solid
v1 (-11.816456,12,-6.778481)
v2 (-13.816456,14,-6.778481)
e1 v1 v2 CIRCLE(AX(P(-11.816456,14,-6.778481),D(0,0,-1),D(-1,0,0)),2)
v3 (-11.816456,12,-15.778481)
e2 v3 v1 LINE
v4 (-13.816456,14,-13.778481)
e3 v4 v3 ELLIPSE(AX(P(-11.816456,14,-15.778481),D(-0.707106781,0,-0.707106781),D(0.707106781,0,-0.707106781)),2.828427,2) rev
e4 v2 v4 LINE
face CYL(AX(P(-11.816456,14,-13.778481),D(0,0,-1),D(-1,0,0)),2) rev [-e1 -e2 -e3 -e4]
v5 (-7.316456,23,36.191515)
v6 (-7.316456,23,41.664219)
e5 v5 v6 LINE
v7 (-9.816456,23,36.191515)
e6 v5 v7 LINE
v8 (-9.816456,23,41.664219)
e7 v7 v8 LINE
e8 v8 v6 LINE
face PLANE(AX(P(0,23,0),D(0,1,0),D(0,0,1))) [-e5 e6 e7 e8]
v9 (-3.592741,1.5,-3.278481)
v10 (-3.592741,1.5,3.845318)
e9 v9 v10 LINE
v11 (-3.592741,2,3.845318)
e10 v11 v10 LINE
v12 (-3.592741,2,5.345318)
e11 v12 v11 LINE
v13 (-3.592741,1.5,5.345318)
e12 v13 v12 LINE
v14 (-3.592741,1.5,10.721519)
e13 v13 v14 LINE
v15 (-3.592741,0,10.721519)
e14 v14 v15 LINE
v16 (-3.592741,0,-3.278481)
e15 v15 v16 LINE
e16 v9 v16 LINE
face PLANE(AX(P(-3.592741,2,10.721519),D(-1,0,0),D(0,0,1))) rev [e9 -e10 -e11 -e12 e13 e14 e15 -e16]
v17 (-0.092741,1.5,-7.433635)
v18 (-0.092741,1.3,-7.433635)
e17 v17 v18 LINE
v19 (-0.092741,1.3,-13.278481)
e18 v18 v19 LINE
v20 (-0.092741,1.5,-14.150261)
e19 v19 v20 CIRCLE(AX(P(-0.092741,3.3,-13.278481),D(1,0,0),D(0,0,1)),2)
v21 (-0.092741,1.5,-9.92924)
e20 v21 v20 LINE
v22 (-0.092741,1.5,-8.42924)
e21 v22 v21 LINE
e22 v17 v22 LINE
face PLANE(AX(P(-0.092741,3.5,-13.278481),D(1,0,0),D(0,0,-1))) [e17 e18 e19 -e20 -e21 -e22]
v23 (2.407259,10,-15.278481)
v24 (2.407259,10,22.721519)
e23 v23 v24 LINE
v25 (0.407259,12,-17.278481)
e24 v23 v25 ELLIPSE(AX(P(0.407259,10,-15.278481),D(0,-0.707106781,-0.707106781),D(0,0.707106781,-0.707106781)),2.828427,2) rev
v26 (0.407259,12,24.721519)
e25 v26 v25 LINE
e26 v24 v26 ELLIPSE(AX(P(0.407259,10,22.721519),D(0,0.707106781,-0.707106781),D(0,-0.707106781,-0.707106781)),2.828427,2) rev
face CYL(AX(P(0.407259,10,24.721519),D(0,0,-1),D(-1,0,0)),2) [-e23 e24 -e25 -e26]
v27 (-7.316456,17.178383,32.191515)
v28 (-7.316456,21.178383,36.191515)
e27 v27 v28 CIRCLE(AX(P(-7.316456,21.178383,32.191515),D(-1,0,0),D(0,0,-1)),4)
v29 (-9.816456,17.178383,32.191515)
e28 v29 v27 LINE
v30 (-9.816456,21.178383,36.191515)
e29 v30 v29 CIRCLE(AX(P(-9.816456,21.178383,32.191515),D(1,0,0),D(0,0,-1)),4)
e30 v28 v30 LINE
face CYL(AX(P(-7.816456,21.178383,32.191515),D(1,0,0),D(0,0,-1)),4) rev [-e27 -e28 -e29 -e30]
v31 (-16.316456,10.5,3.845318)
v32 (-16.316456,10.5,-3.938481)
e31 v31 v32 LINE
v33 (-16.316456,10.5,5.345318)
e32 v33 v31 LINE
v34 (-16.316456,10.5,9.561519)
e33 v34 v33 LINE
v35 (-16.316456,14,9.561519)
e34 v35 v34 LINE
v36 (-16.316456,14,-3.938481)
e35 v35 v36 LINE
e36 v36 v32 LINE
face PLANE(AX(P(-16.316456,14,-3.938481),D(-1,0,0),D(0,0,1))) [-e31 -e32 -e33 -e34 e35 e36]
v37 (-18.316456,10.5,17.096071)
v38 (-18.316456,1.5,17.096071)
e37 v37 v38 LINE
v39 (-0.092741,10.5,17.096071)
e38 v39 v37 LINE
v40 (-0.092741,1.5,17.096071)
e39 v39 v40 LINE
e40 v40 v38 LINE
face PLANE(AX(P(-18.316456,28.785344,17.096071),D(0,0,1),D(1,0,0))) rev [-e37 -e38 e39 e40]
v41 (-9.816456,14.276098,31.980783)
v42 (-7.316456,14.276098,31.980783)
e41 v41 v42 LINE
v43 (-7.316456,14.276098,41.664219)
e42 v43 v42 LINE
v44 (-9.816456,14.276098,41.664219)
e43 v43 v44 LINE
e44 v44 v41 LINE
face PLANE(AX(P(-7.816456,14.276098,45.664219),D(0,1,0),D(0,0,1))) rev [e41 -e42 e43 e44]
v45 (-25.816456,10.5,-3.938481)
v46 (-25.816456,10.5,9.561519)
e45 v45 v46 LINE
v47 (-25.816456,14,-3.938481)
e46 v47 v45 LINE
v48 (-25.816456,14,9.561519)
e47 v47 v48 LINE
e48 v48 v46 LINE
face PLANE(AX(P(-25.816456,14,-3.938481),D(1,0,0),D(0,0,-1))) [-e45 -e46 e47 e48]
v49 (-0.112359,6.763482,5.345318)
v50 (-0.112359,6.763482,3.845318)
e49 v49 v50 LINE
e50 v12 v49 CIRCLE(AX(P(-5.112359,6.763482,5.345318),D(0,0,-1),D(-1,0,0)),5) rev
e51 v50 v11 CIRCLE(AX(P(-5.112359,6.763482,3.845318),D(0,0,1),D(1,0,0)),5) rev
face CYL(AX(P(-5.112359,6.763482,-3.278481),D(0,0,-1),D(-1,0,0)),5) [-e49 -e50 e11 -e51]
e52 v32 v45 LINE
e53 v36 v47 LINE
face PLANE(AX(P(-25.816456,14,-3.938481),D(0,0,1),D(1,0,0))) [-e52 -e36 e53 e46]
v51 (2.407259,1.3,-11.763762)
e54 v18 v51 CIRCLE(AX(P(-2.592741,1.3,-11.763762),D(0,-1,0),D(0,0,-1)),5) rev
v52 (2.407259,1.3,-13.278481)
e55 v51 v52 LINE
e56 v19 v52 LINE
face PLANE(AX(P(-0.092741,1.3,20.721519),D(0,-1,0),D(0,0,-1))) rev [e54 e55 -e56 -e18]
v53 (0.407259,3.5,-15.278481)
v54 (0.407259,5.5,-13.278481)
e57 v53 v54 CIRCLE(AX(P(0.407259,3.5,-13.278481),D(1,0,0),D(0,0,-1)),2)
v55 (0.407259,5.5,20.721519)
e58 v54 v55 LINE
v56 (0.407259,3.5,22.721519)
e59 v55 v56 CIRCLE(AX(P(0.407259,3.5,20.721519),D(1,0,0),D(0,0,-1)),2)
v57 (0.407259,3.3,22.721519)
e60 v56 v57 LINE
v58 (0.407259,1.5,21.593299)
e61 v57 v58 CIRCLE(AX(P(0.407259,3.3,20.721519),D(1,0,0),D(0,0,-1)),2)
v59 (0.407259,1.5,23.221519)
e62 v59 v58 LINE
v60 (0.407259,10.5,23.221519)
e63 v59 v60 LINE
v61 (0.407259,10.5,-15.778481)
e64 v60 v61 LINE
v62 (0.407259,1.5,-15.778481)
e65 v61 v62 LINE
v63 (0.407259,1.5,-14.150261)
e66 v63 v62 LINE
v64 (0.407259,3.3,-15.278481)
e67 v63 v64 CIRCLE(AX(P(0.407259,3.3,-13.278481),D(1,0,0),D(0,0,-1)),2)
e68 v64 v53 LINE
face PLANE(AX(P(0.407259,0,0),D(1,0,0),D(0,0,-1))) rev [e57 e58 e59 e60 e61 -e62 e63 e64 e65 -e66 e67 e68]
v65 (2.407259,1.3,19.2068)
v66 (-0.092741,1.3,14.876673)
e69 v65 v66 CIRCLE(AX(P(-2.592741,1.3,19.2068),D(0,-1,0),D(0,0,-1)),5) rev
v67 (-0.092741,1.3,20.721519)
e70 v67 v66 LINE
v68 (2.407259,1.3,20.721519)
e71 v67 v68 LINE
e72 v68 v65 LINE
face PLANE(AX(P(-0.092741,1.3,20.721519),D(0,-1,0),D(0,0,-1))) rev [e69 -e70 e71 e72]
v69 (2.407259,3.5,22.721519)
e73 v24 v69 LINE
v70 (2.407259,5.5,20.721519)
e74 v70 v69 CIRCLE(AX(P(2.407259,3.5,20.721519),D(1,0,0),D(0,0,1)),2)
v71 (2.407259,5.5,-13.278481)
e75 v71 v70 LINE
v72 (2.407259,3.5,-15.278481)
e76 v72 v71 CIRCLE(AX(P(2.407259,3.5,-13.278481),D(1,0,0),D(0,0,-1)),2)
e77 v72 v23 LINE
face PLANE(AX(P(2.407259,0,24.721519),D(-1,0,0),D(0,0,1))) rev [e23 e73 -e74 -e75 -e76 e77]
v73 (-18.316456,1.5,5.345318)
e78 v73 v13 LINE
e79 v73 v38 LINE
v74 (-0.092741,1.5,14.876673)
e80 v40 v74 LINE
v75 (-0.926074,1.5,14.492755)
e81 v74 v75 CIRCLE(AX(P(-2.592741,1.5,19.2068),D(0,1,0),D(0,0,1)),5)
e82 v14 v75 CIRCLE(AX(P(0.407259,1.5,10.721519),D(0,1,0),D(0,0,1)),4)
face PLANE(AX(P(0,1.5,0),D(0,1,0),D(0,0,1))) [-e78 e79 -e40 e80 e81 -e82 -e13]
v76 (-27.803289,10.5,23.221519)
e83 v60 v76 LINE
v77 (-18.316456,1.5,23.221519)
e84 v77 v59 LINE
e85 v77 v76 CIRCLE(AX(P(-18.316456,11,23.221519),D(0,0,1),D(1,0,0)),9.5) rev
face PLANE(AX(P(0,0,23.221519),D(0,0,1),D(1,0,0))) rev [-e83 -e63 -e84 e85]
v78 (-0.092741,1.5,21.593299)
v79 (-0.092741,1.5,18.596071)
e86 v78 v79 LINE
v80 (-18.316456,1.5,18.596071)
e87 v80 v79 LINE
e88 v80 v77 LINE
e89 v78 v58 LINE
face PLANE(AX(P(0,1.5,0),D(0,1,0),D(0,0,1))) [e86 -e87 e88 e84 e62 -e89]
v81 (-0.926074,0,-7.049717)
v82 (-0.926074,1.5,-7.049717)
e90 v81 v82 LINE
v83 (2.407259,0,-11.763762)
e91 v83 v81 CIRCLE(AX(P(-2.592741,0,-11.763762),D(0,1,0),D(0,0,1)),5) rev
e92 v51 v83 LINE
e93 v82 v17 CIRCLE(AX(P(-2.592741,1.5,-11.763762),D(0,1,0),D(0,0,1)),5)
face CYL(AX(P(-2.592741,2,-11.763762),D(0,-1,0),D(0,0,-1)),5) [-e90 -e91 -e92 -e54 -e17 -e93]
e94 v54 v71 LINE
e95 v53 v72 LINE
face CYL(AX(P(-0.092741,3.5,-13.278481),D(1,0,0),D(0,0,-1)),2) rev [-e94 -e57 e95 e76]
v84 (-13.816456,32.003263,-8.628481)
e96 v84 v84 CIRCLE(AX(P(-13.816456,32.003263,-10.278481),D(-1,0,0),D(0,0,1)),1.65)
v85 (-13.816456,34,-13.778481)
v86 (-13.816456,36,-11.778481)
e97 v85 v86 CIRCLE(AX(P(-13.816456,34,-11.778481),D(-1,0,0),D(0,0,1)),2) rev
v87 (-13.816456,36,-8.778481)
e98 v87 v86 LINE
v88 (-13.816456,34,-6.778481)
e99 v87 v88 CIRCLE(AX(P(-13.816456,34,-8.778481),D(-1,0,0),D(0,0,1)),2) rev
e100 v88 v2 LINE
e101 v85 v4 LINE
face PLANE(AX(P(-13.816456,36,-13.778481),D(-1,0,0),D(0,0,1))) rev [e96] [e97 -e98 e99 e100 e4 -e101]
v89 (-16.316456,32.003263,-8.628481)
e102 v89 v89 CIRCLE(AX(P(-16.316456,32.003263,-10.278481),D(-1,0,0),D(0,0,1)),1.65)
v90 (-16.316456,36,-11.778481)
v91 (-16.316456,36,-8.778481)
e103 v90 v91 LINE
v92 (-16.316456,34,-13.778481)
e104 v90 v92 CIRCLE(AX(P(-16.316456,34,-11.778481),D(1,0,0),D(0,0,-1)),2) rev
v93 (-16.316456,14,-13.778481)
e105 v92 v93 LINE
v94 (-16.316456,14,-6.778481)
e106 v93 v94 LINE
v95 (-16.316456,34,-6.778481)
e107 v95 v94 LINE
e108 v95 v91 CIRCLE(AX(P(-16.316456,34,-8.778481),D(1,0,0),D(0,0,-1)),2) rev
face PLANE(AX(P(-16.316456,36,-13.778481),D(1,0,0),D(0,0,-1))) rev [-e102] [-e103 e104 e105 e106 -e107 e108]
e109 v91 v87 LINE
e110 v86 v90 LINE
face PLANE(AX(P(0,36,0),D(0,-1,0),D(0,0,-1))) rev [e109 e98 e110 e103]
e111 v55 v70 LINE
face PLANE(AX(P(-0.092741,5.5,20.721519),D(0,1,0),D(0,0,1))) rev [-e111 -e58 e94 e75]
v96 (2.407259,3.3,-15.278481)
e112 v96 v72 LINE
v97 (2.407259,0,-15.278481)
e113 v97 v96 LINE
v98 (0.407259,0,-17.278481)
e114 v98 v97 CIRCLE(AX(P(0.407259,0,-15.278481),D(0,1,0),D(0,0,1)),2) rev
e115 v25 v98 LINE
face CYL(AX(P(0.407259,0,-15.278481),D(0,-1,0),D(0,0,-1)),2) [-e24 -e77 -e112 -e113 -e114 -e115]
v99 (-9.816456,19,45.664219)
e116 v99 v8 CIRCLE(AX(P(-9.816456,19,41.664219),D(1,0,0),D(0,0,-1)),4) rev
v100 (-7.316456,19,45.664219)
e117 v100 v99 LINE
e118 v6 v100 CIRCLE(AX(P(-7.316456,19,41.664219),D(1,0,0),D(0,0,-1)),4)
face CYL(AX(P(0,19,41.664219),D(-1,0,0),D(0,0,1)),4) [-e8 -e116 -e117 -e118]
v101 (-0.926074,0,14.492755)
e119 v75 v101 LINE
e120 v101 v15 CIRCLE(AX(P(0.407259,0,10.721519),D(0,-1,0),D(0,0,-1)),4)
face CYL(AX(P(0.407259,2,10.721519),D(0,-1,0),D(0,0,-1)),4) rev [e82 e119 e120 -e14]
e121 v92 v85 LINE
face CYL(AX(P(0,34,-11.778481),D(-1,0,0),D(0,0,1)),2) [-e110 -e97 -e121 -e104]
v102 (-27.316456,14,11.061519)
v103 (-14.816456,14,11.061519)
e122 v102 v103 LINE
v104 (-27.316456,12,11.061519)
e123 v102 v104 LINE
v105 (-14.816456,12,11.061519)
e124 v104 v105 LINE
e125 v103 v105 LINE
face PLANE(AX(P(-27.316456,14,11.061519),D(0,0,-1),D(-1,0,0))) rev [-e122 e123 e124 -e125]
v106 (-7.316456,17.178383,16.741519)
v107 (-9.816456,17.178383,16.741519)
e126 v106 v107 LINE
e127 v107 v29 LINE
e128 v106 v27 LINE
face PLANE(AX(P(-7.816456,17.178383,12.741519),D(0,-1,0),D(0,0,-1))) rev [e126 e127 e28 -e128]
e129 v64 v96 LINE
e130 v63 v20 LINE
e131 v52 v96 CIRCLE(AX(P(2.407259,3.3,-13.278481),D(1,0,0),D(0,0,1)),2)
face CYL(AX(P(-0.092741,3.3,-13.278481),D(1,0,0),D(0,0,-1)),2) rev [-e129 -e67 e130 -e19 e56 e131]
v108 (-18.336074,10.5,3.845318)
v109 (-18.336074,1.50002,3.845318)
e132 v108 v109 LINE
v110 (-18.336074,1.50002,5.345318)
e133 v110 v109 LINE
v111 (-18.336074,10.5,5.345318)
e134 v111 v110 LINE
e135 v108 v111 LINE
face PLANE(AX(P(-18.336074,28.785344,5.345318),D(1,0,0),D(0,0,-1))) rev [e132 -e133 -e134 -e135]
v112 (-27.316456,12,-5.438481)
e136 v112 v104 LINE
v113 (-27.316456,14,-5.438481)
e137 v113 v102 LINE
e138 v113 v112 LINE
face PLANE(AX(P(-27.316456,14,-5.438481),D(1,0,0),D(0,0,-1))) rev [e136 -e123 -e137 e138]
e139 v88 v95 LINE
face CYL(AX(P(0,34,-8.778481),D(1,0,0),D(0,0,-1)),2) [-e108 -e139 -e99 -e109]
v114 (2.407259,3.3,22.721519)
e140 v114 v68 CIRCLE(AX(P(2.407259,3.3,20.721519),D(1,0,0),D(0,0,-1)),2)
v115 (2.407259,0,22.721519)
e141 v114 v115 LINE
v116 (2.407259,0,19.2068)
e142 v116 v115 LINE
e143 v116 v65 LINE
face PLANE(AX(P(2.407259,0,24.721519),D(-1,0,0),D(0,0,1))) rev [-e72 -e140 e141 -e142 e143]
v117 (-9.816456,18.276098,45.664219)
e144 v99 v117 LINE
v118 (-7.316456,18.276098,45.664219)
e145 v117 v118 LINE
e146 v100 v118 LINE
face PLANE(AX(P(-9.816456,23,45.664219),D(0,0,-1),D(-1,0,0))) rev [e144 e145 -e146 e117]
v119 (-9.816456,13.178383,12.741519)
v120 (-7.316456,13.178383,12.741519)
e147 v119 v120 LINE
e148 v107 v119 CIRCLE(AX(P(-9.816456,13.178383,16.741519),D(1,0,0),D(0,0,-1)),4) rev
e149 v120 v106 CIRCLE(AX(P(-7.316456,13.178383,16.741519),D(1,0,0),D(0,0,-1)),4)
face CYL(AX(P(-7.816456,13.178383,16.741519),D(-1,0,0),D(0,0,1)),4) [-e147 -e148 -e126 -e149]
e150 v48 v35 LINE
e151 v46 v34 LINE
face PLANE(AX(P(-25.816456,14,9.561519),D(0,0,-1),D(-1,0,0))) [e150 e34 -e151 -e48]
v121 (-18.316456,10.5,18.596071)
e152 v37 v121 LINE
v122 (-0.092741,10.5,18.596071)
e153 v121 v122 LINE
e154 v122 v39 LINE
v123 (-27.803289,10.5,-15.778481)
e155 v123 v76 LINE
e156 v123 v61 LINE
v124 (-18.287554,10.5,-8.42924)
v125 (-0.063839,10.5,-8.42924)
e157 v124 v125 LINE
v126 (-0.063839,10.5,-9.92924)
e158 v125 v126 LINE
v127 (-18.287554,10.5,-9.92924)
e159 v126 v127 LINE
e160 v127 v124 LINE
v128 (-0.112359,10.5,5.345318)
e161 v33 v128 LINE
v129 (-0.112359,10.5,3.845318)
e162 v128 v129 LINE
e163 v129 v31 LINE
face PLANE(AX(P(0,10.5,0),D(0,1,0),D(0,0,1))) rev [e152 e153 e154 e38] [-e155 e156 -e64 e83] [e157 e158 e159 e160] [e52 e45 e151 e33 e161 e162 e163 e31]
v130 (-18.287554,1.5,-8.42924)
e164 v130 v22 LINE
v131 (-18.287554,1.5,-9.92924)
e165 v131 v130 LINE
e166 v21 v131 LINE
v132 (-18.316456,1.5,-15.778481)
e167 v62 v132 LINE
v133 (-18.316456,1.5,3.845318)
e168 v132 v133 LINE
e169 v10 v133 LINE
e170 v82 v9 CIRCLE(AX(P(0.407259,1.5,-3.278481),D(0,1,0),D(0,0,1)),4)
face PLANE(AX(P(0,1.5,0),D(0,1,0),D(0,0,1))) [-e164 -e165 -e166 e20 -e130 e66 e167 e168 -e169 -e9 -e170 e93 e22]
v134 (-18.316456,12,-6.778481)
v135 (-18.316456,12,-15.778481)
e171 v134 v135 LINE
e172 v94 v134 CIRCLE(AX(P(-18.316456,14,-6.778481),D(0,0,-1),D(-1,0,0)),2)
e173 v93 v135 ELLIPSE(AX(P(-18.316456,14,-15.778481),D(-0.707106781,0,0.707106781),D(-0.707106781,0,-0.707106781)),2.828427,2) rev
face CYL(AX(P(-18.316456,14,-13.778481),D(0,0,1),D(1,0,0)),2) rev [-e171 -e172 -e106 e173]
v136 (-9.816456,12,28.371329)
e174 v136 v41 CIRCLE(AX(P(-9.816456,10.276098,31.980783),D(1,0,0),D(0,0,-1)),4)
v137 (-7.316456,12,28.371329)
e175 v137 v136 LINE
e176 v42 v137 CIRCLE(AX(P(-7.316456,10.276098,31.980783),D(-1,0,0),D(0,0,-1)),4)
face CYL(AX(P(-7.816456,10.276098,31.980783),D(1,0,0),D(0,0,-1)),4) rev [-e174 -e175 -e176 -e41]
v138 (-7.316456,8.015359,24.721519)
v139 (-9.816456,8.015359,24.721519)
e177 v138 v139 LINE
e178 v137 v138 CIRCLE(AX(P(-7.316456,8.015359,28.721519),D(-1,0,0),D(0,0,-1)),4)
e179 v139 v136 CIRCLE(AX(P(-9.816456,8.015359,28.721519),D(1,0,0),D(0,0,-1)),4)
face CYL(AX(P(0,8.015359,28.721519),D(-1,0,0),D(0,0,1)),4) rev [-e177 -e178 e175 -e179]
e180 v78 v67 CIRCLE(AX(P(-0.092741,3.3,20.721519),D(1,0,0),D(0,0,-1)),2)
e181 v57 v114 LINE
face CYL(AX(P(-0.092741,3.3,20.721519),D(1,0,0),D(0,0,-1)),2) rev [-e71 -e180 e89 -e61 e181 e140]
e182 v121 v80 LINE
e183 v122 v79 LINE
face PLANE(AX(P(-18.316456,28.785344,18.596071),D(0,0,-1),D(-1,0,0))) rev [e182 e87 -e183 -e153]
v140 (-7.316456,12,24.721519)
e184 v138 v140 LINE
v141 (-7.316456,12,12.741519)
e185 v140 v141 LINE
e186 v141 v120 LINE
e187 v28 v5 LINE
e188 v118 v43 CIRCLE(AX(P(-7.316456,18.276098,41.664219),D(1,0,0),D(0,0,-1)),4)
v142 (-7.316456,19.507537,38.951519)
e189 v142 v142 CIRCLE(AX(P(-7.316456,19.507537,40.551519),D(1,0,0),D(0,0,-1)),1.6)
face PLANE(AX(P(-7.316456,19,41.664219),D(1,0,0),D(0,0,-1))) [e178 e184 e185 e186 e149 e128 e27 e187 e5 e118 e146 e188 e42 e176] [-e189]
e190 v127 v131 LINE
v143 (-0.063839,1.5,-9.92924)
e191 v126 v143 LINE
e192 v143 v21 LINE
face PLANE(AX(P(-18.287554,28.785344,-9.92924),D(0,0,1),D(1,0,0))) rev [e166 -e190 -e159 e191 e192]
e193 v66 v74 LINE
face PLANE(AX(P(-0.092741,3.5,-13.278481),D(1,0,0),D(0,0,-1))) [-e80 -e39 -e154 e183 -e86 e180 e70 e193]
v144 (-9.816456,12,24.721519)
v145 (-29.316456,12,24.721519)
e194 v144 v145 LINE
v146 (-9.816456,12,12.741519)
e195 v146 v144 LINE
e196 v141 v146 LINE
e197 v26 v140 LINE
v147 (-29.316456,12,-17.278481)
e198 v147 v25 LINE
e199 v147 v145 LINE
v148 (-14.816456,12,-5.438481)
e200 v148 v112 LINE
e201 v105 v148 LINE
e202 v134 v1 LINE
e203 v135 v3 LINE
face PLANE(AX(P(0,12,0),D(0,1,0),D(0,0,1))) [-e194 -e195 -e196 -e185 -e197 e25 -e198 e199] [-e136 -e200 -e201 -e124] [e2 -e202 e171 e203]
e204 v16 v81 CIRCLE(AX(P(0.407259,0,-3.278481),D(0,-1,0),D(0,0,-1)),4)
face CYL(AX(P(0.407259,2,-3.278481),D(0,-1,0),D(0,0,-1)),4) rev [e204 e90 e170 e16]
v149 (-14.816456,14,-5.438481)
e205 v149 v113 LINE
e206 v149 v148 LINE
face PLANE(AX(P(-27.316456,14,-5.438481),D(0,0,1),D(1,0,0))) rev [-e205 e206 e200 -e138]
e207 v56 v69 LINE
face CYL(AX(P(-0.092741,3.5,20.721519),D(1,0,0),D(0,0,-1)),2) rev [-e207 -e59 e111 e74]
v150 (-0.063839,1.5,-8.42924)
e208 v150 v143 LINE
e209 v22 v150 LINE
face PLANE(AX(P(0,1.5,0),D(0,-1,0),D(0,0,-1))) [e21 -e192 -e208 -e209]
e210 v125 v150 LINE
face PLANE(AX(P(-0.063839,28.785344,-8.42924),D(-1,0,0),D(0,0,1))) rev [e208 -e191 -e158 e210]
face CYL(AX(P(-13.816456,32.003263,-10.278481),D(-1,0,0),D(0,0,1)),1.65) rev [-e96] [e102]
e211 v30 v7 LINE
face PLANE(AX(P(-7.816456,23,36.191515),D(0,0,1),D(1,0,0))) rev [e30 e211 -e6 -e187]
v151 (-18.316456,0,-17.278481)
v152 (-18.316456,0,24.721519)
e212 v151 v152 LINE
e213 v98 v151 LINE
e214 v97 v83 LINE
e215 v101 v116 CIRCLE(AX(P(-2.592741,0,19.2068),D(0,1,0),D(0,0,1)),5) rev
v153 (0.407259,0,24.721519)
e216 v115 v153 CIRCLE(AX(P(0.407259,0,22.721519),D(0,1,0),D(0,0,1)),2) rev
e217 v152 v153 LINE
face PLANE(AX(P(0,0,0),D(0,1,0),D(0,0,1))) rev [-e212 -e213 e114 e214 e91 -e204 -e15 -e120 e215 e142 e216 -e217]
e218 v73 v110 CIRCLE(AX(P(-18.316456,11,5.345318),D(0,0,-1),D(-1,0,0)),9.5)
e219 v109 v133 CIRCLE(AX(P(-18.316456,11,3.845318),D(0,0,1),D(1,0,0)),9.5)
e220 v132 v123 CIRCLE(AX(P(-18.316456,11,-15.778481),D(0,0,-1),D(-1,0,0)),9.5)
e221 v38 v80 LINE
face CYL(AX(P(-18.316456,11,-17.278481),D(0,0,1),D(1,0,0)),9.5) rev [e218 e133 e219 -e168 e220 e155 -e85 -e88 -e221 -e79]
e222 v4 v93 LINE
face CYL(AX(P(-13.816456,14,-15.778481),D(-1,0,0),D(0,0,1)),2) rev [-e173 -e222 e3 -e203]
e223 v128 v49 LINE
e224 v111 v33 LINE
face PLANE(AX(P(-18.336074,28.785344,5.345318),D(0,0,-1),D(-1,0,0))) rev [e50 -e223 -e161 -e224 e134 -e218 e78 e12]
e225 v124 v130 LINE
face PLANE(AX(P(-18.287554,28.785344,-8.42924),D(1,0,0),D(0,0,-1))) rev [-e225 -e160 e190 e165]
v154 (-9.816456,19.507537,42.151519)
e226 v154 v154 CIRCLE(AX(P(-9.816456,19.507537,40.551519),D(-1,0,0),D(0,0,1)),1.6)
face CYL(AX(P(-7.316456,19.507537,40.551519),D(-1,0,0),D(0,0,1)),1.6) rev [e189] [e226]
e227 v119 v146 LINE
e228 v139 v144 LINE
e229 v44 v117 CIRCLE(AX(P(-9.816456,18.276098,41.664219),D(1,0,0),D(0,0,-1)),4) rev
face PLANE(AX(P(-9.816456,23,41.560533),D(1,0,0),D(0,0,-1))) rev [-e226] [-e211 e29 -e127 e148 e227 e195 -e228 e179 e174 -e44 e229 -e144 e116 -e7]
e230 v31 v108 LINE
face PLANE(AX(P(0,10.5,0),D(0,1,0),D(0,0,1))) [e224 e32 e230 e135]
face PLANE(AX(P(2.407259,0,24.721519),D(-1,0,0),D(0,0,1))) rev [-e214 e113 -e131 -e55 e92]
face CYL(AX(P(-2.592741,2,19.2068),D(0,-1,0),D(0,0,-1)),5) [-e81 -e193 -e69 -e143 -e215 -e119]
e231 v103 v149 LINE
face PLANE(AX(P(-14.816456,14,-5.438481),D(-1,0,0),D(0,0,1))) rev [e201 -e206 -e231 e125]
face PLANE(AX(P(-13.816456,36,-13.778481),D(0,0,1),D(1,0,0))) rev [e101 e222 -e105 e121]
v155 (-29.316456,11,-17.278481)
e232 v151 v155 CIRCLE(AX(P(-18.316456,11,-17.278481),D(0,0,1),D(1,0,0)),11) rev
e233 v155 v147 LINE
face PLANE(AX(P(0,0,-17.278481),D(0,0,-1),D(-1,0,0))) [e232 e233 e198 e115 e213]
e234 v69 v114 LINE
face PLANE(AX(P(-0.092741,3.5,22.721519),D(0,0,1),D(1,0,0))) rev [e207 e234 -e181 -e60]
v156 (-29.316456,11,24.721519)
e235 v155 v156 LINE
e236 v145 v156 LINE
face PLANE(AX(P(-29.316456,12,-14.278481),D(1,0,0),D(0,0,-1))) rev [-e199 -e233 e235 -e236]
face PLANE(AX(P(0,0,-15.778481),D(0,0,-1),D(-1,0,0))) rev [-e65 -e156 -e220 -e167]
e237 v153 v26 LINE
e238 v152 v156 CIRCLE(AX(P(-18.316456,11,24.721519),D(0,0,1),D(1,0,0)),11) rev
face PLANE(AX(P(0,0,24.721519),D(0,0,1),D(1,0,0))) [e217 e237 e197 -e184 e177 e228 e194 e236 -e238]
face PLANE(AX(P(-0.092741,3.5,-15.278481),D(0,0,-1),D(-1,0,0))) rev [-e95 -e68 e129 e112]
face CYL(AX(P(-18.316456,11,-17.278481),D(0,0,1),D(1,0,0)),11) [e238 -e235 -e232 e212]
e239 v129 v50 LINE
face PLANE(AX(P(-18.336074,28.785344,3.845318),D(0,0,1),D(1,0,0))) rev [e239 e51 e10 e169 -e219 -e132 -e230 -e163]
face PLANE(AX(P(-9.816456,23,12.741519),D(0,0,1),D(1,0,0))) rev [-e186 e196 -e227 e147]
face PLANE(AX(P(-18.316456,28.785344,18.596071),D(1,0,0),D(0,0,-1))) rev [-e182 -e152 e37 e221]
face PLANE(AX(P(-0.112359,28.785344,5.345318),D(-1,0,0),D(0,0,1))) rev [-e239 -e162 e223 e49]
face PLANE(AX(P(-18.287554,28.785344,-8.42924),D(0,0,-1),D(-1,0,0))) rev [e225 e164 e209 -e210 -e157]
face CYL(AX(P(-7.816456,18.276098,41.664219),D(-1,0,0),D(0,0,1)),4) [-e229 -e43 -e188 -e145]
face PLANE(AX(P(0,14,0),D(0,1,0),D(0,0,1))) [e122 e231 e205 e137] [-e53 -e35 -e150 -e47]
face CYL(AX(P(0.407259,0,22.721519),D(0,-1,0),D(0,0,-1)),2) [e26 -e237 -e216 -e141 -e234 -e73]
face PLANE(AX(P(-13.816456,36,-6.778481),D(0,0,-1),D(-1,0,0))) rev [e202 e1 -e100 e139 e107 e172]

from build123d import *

# Parameters (mm, degrees)
SALIENTE_EXTRUIR1_DEPTH  = 12
CROQUIS2_W               = 12.5
CROQUIS2_H               = 16.5
CROQUIS2_W_2             = 9.5
CROQUIS2_H_2             = 13.5
SALIENTE_EXTRUIR2_DEPTH  = 2
SALIENTE_EXTRUIR4_DEPTH  = 11
CROQUIS4_R               = 1.6
CORTAR_EXTRUIR1_DEPTH    = 2.5
CROQUIS5_W               = 17.29289048
CROQUIS5_H               = 2.276098228
CROQUIS5_W_2             = 23.449996424
CROQUIS5_H_2             = 5.821617307
CORTAR_EXTRUIR2_DEPTH    = 2
SALIENTE_EXTRUIR5_DEPTH  = 3
CROQUIS7_W               = 60
CROQUIS7_H               = 12
SALIENTE_EXTRUIR6_DEPTH  = 3
CORTAR_EXTRUIR3_DEPTH    = 42
VACIADO4_START           = -15.778481013
VACIADO4_DEPTH           = 39
VACIADO4_2_OUTLINE_W     = 28
VACIADO4_2_OUTLINE_H     = 9
VACIADO4_2_DEPTH         = 4
VACIADO4_START_2         = 19.221518987
VACIADO4_3_OUTLINE_W     = 28
VACIADO4_3_OUTLINE_H     = 9
VACIADO4_3_DEPTH         = 4
VACIADO4_START_3         = -3.938481013
VACIADO4_4_OUTLINE_W     = 9.5
VACIADO4_4_OUTLINE_H     = 1.5
VACIADO4_4_DEPTH         = 13.5
REDONDEO2_R              = 4
REDONDEO3_R              = 4
CROQUIS10_W              = 2.5
CROQUIS10_H              = 7
SALIENTE_EXTRUIR8_DEPTH  = 24
CROQUIS11_R              = 1.65
CORTAR_EXTRUIR4_DEPTH    = 2.5
CROQUIS14_R              = 1.6
SALIENTE_EXTRUIR10_DEPTH = 0.5
CROQUIS15_W              = 28.276285021
CROQUIS15_H              = 42
CORTAR_EXTRUIR5_DEPTH    = 12
CROQUIS16_W              = 42
CROQUIS16_H              = 12
SALIENTE_EXTRUIR11_DEPTH = 2
CORTAR_EXTRUIR6_DEPTH    = 2.5
CROQUIS19_W              = 18.223714979
CROQUIS19_H              = 1.5
SALIENTE_EXTRUIR16_DEPTH = 9
REDONDEO4_R              = 2
REDONDEO5_R              = 2
REDONDEO6_R              = 2
CORTAR_EXTRUIR7_DEPTH    = 2
REDONDEO7_R              = 5
REDONDEO8_R              = 5


with BuildPart() as part:
    # Croquis1 → Saliente-Extruir1 (new body)
    with BuildSketch(Plane(origin=(0, 0, 0), x_dir=(1, 0, 0), z_dir=(0, 1, 0))):
        Polygon((30.683544304, -17.721518987), (30.683544304, -21.721518987), (-29.316455696, -21.721518987), (-29.316455696, 14.278481013), (30.683544304, 14.278481013), (30.683544304, 10.278481013), (2.683544304, 10.278481013), (2.683544304, -17.721518987), align=None)
    extrude(amount=SALIENTE_EXTRUIR1_DEPTH)

    # Croquis2 → Saliente-Extruir2 (add)
    with BuildSketch(Plane(origin=(0, 12, 0), x_dir=(1, 0, 0), z_dir=(0, 1, 0))):
        with Locations((-21.066455696, -2.811518987)):
            Rectangle(CROQUIS2_W, CROQUIS2_H)
        with Locations((-21.066455696, -2.811518987)):
            Rectangle(CROQUIS2_W_2, CROQUIS2_H_2, mode=Mode.SUBTRACT)
    extrude(amount=SALIENTE_EXTRUIR2_DEPTH)

    # Croquis3 → Saliente-Extruir4 (add)
    with BuildSketch(Plane(origin=(0, 12, 0), x_dir=(1, 0, 0), z_dir=(0, 1, 0))):
        Polygon((-7.816455696, -12.741518987), (-7.816455696, -41.560532566), (-7.816455696, -45.664219129), (-9.816455696, -45.664219129), (-9.816455696, -41.560532566), (-9.816455696, -12.741518987), align=None)
    extrude(amount=SALIENTE_EXTRUIR4_DEPTH)

    # Croquis4 → Cortar-Extruir1 (cut)
    with BuildSketch(Plane.ZY.offset(9.816455696)):
        with Locations((40.551518987, 19.507537468)):
            Circle(CROQUIS4_R)
    extrude(amount=-CORTAR_EXTRUIR1_DEPTH, mode=Mode.SUBTRACT)

    # Croquis5 → Cortar-Extruir2 (cut)
    with BuildSketch(Plane.ZY.offset(9.816455696)):
        with Locations((37.017773889, 13.138049114)):
            Rectangle(CROQUIS5_W, CROQUIS5_H)
        with Locations((24.466517199, 20.089191347)):
            Rectangle(CROQUIS5_W_2, CROQUIS5_H_2)
    extrude(amount=-CORTAR_EXTRUIR2_DEPTH, mode=Mode.SUBTRACT)

    # Croquis6 → Saliente-Extruir5 (add)
    with BuildSketch(Plane.XY.offset(21.721518987)):
        Polygon((-29.316455696, 0), (30.683544304, 0), (30.683544304, 12), (-7.816455696, 12), (-9.816455696, 12), (-29.316455696, 12), align=None)
    extrude(amount=SALIENTE_EXTRUIR5_DEPTH)

    # Croquis7 → Saliente-Extruir6 (add)
    with BuildSketch(Plane(origin=(0, 0, -14.278481013), x_dir=(-1, 0, 0), z_dir=(0, 0, -1))):
        with Locations((-0.683544304, 6)):
            Rectangle(CROQUIS7_W, CROQUIS7_H)
    extrude(amount=SALIENTE_EXTRUIR6_DEPTH)

    # Croquis8 → Cortar-Extruir3 (cut)
    with BuildSketch(Plane.XY.offset(24.721518987)):
        with BuildLine():
            Line((-29.316455696, 0), (-18.316455696, 0))
            ThreePointArc((-18.316455696, 0), (-26.094630289, 3.221825407), (-29.316455696, 11))
            Line((-29.316455696, 11), (-29.316455696, 0))
        make_face()
    extrude(amount=-CORTAR_EXTRUIR3_DEPTH, mode=Mode.SUBTRACT)

    # Vaciado4: read off the stored shape, not the designer's step
    # Vaciado4 outline → Vaciado4 (cut)
    with BuildSketch(Plane.XY.offset(VACIADO4_START)):
        with BuildLine():
            Line((1.183544304, 10.5), (-27.803288677, 10.5))
            ThreePointArc((-27.803288677, 10.5), (-24.854804112, 4.107975624), (-18.316455696, 1.5))
            Line((-18.316455696, 1.5), (1.183544304, 1.5))
            Line((1.183544304, 1.5), (1.183544304, 10.5))
        make_face()
    extrude(amount=VACIADO4_DEPTH, mode=Mode.SUBTRACT)

    # Vaciado4 2 outline → Vaciado4 2 (cut)
    with BuildSketch(Plane.XY.offset(VACIADO4_START)):
        with Locations((15.183544304, 6)):
            Rectangle(VACIADO4_2_OUTLINE_W, VACIADO4_2_OUTLINE_H)
    extrude(amount=VACIADO4_2_DEPTH, mode=Mode.SUBTRACT)

    # Vaciado4 3 outline → Vaciado4 3 (cut)
    with BuildSketch(Plane.XY.offset(VACIADO4_START_2)):
        with Locations((15.183544304, 6)):
            Rectangle(VACIADO4_3_OUTLINE_W, VACIADO4_3_OUTLINE_H)
    extrude(amount=VACIADO4_3_DEPTH, mode=Mode.SUBTRACT)

    # Vaciado4 4 outline → Vaciado4 4 (cut)
    with BuildSketch(Plane.XY.offset(VACIADO4_START_3)):
        with Locations((-21.066455696, 11.25)):
            Rectangle(VACIADO4_4_OUTLINE_W, VACIADO4_4_OUTLINE_H)
    extrude(amount=VACIADO4_4_DEPTH, mode=Mode.SUBTRACT)

    # Redondeo2
    # the kernel refuses this fillet: 4 mm, written as the material it adds along each edge
    with BuildSketch(Plane(origin=(-9.816455696, 12, 24.721518987), x_dir=(0, -1, 0), z_dir=(1, 0, 0))) as redondeo2_piece_1:
        with BuildLine():
            CenterArc((3.984641355, -4), REDONDEO2_R, 90, 84.977462971)
            Line((0, -3.649809662), (0, 0))
            Line((0, 0), (3.984641355, 0))
        make_face()
    extrude(amount=2)
    with BuildSketch(Plane(origin=(-9.816455696, 14.276098228, 28.371328649), x_dir=(0, 0, 1), z_dir=(1, 0, 0))) as redondeo2_piece_2:
        with BuildLine():
            CenterArc((3.609454623, 4), REDONDEO2_R, 205.52948015, 64.47051985)
            Line((0, 2.276098228), (0, 0))
            Line((0, 0), (3.609454623, 0))
        make_face()
    extrude(amount=2)
    with BuildSketch(Plane(origin=(-9.816455696, 17.178382693, 36.191515411), x_dir=(0, 0, -1), z_dir=(1, 0, 0))) as redondeo2_piece_3:
        with BuildLine():
            CenterArc((REDONDEO2_R, REDONDEO2_R), REDONDEO2_R, 180, 90)
            Line((0, REDONDEO2_R), (0, 0))
            Line((0, 0), (REDONDEO2_R, 0))
        make_face()
    extrude(amount=2)
    # the kernel refuses this fillet: 4 mm, written as the material it takes off along each edge
    with BuildSketch(Plane(origin=(-19.816455696, 17.178382693, 12.741518987), x_dir=(0, 0, 1), z_dir=(1, 0, 0))) as redondeo2_2_piece_1:
        with BuildLine():
            CenterArc((REDONDEO2_R, REDONDEO2_R), REDONDEO2_R, 180, 90)
            Line((0, REDONDEO2_R), (0, 0))
            Line((0, 0), (REDONDEO2_R, 0))
        make_face()
    extrude(amount=22, mode=Mode.SUBTRACT)

    # Redondeo3
    redondeo3_edges = [part.edges().sort_by_distance(p)[0] for p in [
        (-8.816455696, 23, 45.664219129),
        (-8.816455696, 14.276098228, 45.664219129),
    ]]
    fillet(redondeo3_edges, radius=REDONDEO3_R)

    # Croquis10 → Saliente-Extruir8 (add)
    with BuildSketch(Plane(origin=(0, 12, 0), x_dir=(1, 0, 0), z_dir=(0, 1, 0))):
        with Locations((-15.066455696, 10.278481013)):
            Rectangle(CROQUIS10_W, CROQUIS10_H)
    extrude(amount=SALIENTE_EXTRUIR8_DEPTH)

    # Croquis11 → Cortar-Extruir4 (cut)
    with BuildSketch(Plane.ZY.offset(16.316455696)):
        with Locations((-10.278481013, 32.003262859)):
            Circle(CROQUIS11_R)
    extrude(amount=-CORTAR_EXTRUIR4_DEPTH, mode=Mode.SUBTRACT)

    # Croquis14 → Saliente-Extruir10 (add)
    with BuildSketch(Plane(origin=(-7.816455696, 0, 0), x_dir=(0, 0, -1), z_dir=(1, 0, 0))):
        with BuildLine():
            Line((-36.191515411, 23), (-41.664219129, 23))
            ThreePointArc((-41.664219129, 23), (-44.492646254, 21.828427125), (-45.664219129, 19))
            Line((-45.664219129, 19), (-45.664219129, 18.276098228))
            ThreePointArc((-45.664219129, 18.276098228), (-44.492646254, 15.447671103), (-41.664219129, 14.276098228))
            Line((-41.664219129, 14.276098228), (-31.980783273, 14.276098228))
            ThreePointArc((-31.980783273, 14.276098228), (-29.847195577, 13.659558519), (-28.371328649, 12))
            ThreePointArc((-28.371328649, 12), (-25.771878217, 10.717139414), (-24.721518987, 8.015358645))
            Line((-24.721518987, 8.015358645), (-24.721518987, 12))
            Line((-24.721518987, 12), (-12.741518987, 12))
            Line((-12.741518987, 12), (-12.741518987, 13.178382693))
            ThreePointArc((-12.741518987, 13.178382693), (-13.913091863, 16.006809817), (-16.741518987, 17.178382693))
            Line((-16.741518987, 17.178382693), (-32.191515411, 17.178382693))
            ThreePointArc((-32.191515411, 17.178382693), (-35.019942535, 18.349955568), (-36.191515411, 21.178382693))
            Line((-36.191515411, 21.178382693), (-36.191515411, 23))
        make_face()
        with Locations(Location((-40.551518987, 19.507537468, 0), (0, 0, 180))):
            Circle(CROQUIS14_R, mode=Mode.SUBTRACT)
    extrude(amount=SALIENTE_EXTRUIR10_DEPTH)

    # Croquis15 → Cortar-Extruir5 (cut)
    with BuildSketch(Plane(origin=(0, 12, 0), x_dir=(1, 0, 0), z_dir=(0, 1, 0))):
        with Locations((16.545401794, -3.721518987)):
            Rectangle(CROQUIS15_W, CROQUIS15_H)
    extrude(amount=-CORTAR_EXTRUIR5_DEPTH, mode=Mode.SUBTRACT)

    # Croquis16 → Saliente-Extruir11 (add)
    with BuildSketch(Plane(origin=(2.407259283, 0, 0), x_dir=(0, 0, -1), z_dir=(1, 0, 0))):
        with Locations((-3.721518987, 6)):
            Rectangle(CROQUIS16_W, CROQUIS16_H)
    extrude(amount=-SALIENTE_EXTRUIR11_DEPTH)

    # Croquis18 → Cortar-Extruir6 (cut)
    with BuildSketch(Plane(origin=(2.407259283, 0, 0), x_dir=(0, 0, -1), z_dir=(1, 0, 0))):
        with BuildLine():
            Line((-20.721518987, 5.5), (13.278481013, 5.5))
            ThreePointArc((13.278481013, 5.5), (14.692694575, 4.914213562), (15.278481013, 3.5))
            Line((15.278481013, 3.5), (15.278481013, 3.3))
            ThreePointArc((15.278481013, 3.3), (14.692694575, 1.885786438), (13.278481013, 1.3))
            Line((13.278481013, 1.3), (-20.721518987, 1.3))
            ThreePointArc((-20.721518987, 1.3), (-22.13573255, 1.885786438), (-22.721518987, 3.3))
            Line((-22.721518987, 3.3), (-22.721518987, 3.5))
            ThreePointArc((-22.721518987, 3.5), (-22.13573255, 4.914213562), (-20.721518987, 5.5))
        make_face()
    extrude(amount=-CORTAR_EXTRUIR6_DEPTH, mode=Mode.SUBTRACT)

    # Croquis19 → Saliente-Extruir16 (add)
    with BuildSketch(Plane(origin=(0, 1.5, 0), x_dir=(1, 0, 0), z_dir=(0, 1, 0))):
        with Locations((-9.204598207, -17.846071371)):
            Rectangle(CROQUIS19_W, CROQUIS19_H)
        with Locations((-9.224216979, -4.59531752)):
            Rectangle(CROQUIS19_W, CROQUIS19_H)
        with Locations((-9.175696895, 9.179239743)):
            Rectangle(CROQUIS19_W, CROQUIS19_H)
    extrude(amount=SALIENTE_EXTRUIR16_DEPTH)

    # Redondeo4
    # the kernel refuses this fillet: 2 mm, written as the material it takes off along each edge
    with BuildSketch(Plane(origin=(2.407259283, 12, -22.278481013), x_dir=(-1, 0, 0), z_dir=(0, 0, 1))) as redondeo4_piece_1:
        with BuildLine():
            CenterArc((REDONDEO4_R, REDONDEO4_R), REDONDEO4_R, 180, 90)
            Line((0, REDONDEO4_R), (0, 0))
            Line((0, 0), (REDONDEO4_R, 0))
        make_face()
    extrude(amount=52, mode=Mode.SUBTRACT)
    with BuildSketch(Plane(origin=(2.407259283, 17, 24.721518987), x_dir=(-1, 0, 0), z_dir=(0, -1, 0)), Plane(origin=(2.407259283, 17, -17.278481013), x_dir=(0, 0, 1), z_dir=(0, -1, 0))) as redondeo4_piece_2:
        with BuildLine():
            CenterArc((REDONDEO4_R, REDONDEO4_R), REDONDEO4_R, 180, 90)
            Line((0, REDONDEO4_R), (0, 0))
            Line((0, 0), (REDONDEO4_R, 0))
        make_face()
    extrude(amount=22, mode=Mode.SUBTRACT)

    # Redondeo5
    redondeo5_edges = [part.edges().sort_by_distance(p)[0] for p in [
        (-15.066455696, 36, -13.778481013),
        (-15.066455696, 36, -6.778481013),
    ]]
    fillet(redondeo5_edges, radius=REDONDEO5_R)

    # Redondeo6
    redondeo6_edges = [part.edges().sort_by_distance(p)[0] for p in [
        (-13.816455696, 12, -10.278481013),
        (-15.066455696, 12, -13.778481013),
        (-16.316455696, 12, -10.278481013),
    ]]
    fillet(redondeo6_edges, radius=REDONDEO6_R)

    # Croquis20 → Cortar-Extruir7 (cut)
    with BuildSketch(Plane.XZ):
        with BuildLine():
            Line((2.407259283, 14.721518987), (0.407259283, 14.721518987))
            ThreePointArc((0.407259283, 14.721518987), (-2.421167842, 13.549946112), (-3.592740717, 10.721518987))
            Line((-3.592740717, 10.721518987), (-3.592740717, -3.278481013))
            ThreePointArc((-3.592740717, -3.278481013), (-2.421167842, -6.106908137), (0.407259283, -7.278481013))
            Line((0.407259283, -7.278481013), (2.407259283, -7.278481013))
            Line((2.407259283, -7.278481013), (2.407259283, 14.721518987))
        make_face()
    extrude(amount=-CORTAR_EXTRUIR7_DEPTH, mode=Mode.SUBTRACT)

    # Redondeo7
    # the kernel refuses this fillet: 5 mm, written as the material it takes off along each edge
    with BuildSketch(Plane(origin=(2.407259283, -11.213203436, -7.278481013), x_dir=(-0.9976533062578327, 0, 0.06846809850445046), z_dir=(0, 1, 0))) as redondeo7_piece_1_section:
        with BuildLine():
            CenterArc((4.681167844, -4.817096285), REDONDEO7_R, 105.545216035, 70.528779366)
            Line((-0.307098687, -4.474755793), (-0.80592534, -4.440521743))
            Line((-0.80592534, -4.440521743), (-0.498826653, 0.034234049))
            Line((-0.498826653, 0.034234049), (0.034234049, 0.498826653))
            ThreePointArc((0.034234049, 0.498826653), (2.029540662, 0.361890456), (3.207174666, 0.481709629))
            Line((3.207174666, 0.481709629), (3.341174046, 0))
        make_face()
    redondeo7_piece_1 = extrude(amount=23.726406871, mode=Mode.PRIVATE)
    redondeo7_piece_1 = split(redondeo7_piece_1, bisect_by=Plane(origin=(2.407259283, 1.5, -7.278481013), z_dir=(0, -1, 0)), keep=Keep.TOP, mode=Mode.PRIVATE)
    add(redondeo7_piece_1, mode=Mode.SUBTRACT)
    with BuildSketch(Plane(origin=(2.407259283, -11.213203436, 14.721518987), x_dir=(0, 0, 1), z_dir=(0, 1, 0))) as redondeo7_piece_2_section:
        with BuildLine():
            CenterArc((4.485281374, -5), REDONDEO7_R, 90, 70.528779366)
            Line((-0.228763834, -3.333333333), (-0.700168354, -3.166666667))
            ThreePointArc((-0.700168354, -3.166666667), (-0.5, -2), (-0.5, 0))
            Line((-0.5, 0), (0, 0.5))
            Line((0, 0.5), (4.485281374, 0.5))
            Line((4.485281374, 0.5), (4.485281374, 0))
        make_face()
    redondeo7_piece_2 = extrude(amount=23.726406871, mode=Mode.PRIVATE)
    redondeo7_piece_2 = split(redondeo7_piece_2, bisect_by=Plane(origin=(2.407259283, 1.5, 14.721518987), z_dir=(0, -1, 0)), keep=Keep.TOP, mode=Mode.PRIVATE)
    add(redondeo7_piece_2, mode=Mode.SUBTRACT)

    # Redondeo8
    # the kernel refuses this fillet: 5 mm, written as the material it takes off along each edge
    with BuildSketch(Plane(origin=(-0.11235949, 2, -8.063386961), x_dir=(-1, 0, 0), z_dir=(0, 0, 1))) as redondeo8_piece_1_section:
        with BuildLine():
            CenterArc((5, -4.763481792), REDONDEO8_R, 107.693426123, 72.306573877)
            Line((0, -4.763481792), (0, 0))
            Line((0, 0), (3.480381227, 0))
        make_face()
    redondeo8_piece_1 = extrude(amount=25.317408961, mode=Mode.PRIVATE)
    redondeo8_piece_1 = split(redondeo8_piece_1, bisect_by=Plane(origin=(-0.11235949, 2, 17.096071371), z_dir=(0, 0, -1)), keep=Keep.TOP, mode=Mode.PRIVATE)
    add(redondeo8_piece_1, mode=Mode.SUBTRACT)


solid = part.part
